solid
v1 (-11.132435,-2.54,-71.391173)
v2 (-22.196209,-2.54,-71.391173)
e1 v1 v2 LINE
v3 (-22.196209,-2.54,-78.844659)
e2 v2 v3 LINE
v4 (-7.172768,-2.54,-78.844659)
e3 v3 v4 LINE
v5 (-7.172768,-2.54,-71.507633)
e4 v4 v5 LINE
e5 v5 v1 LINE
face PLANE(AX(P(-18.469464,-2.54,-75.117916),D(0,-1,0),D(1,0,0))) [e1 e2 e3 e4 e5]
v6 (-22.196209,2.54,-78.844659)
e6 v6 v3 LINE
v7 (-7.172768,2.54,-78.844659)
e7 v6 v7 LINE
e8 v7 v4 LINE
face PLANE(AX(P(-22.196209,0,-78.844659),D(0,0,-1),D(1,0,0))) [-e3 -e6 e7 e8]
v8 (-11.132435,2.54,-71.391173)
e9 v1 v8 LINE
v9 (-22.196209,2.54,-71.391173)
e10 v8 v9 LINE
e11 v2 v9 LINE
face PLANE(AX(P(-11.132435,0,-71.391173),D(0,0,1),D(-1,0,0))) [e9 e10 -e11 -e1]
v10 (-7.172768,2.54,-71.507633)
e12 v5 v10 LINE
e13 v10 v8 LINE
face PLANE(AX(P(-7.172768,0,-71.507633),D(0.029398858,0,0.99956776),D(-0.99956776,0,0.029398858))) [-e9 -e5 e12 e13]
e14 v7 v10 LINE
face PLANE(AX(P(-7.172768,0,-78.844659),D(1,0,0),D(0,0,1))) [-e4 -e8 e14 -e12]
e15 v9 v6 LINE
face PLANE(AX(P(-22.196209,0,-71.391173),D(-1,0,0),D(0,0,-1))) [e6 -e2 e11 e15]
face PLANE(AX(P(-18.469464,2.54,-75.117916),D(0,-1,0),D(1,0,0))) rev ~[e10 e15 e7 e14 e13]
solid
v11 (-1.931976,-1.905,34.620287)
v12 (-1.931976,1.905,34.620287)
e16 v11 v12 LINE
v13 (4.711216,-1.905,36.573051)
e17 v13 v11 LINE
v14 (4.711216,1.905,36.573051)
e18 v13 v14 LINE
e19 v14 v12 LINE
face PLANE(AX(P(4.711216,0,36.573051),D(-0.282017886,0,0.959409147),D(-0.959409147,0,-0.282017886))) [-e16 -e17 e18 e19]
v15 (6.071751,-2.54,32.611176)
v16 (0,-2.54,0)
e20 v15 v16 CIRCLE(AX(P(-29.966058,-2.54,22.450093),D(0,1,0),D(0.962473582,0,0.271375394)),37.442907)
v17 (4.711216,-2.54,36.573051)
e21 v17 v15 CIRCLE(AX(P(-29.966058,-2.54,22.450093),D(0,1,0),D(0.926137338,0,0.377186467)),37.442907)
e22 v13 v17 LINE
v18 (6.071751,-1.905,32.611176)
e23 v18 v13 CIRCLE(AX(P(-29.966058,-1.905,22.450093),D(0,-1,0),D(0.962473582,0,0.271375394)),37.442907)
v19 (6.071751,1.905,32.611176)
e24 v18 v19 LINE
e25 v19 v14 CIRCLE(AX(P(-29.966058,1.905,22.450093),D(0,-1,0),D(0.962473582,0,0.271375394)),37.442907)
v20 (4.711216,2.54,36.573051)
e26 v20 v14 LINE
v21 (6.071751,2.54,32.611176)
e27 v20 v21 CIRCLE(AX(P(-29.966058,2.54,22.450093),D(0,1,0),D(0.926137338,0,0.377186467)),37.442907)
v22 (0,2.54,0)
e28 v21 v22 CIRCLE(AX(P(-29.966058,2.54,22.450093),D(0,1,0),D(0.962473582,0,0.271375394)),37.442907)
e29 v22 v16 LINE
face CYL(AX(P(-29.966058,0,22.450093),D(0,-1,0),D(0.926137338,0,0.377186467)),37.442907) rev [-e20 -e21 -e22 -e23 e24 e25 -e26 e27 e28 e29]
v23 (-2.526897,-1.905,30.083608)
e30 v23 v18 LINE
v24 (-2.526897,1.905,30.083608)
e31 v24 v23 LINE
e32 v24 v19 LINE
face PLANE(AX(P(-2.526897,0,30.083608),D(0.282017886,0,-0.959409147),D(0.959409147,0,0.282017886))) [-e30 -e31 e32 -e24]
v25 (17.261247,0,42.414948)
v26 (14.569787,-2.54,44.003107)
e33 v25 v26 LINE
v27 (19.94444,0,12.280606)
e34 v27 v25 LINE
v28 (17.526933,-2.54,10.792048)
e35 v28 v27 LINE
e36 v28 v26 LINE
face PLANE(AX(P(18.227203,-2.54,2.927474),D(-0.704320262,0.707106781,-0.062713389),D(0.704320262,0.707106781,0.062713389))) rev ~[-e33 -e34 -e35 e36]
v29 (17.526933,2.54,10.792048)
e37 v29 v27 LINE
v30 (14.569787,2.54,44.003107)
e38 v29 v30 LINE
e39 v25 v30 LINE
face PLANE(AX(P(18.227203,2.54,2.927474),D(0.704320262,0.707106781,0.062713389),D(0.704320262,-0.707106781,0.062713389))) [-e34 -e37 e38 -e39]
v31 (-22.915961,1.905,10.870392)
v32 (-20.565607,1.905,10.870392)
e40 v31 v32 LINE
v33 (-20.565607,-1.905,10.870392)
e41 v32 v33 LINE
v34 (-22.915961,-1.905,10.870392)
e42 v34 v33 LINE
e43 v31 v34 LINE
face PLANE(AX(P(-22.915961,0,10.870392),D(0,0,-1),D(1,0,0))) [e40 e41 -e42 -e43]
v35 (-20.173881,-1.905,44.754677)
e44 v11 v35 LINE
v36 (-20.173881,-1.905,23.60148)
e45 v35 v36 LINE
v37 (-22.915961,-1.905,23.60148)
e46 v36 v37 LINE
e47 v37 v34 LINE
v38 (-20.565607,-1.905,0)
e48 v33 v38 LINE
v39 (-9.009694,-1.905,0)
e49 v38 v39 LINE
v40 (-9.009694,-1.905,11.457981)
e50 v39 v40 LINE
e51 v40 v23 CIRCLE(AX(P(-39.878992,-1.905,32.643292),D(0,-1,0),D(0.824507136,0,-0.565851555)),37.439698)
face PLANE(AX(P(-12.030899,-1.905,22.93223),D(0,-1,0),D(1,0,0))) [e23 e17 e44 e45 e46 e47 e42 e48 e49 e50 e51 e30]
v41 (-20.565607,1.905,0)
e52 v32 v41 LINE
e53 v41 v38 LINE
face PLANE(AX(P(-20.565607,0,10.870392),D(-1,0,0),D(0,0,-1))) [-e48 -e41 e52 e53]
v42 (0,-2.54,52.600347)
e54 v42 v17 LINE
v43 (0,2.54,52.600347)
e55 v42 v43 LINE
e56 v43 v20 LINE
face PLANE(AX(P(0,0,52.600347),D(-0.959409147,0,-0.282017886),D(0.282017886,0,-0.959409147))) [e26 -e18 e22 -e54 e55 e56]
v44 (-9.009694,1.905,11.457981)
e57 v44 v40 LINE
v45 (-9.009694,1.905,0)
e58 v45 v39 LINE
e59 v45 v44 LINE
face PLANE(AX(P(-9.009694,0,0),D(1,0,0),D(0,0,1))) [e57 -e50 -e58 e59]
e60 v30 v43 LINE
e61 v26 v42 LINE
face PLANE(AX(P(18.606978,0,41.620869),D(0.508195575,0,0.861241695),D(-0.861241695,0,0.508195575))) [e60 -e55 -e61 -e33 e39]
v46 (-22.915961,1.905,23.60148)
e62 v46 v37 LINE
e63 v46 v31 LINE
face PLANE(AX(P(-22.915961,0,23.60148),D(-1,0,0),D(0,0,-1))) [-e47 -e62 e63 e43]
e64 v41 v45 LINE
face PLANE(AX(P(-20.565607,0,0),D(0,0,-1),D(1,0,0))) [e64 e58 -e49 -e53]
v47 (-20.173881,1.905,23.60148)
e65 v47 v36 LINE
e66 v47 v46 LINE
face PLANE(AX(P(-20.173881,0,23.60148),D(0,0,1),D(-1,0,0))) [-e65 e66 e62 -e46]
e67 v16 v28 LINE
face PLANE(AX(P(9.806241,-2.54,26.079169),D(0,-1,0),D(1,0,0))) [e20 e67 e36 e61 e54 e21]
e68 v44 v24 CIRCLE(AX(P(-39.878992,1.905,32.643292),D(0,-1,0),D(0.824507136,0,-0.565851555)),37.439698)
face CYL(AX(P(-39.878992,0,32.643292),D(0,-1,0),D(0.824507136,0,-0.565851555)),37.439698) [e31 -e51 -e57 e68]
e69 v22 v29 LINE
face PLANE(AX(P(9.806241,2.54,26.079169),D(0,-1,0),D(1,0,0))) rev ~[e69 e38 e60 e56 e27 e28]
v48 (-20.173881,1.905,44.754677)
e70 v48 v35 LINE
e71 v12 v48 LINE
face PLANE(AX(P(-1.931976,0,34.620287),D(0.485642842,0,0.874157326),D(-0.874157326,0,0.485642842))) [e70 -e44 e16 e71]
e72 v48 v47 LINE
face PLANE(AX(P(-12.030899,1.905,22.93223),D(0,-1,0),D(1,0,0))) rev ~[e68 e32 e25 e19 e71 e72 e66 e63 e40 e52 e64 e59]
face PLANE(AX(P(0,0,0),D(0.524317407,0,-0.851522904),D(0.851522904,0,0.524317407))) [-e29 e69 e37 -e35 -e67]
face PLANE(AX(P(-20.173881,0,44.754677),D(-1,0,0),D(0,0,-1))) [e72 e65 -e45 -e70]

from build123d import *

# Parameters (mm, degrees)
F3_DEPTH    = 1.905
F4_DEPTH    = 2.54
F5_T1_DEPTH = 48.3053442814
F6_DEPTH    = 2.54


# Not quite as in the source:
# - a fillet or chamfer that OpenCascade refuses, or shapes differently, is made with other operations: its cross-section is extruded or revolved along the edge and cut away or added
# - the program builds the solid bodies; features that only make, move or delete a surface that nothing else refers to are left out


with BuildPart() as f3:
    # F0 (on Front) → F3 (new body, symmetric)
    with BuildSketch(Plane.XZ):
        with BuildLine():
            Line((-1.9319759193, 34.6202871443), (-20.1738812029, 44.7546765208))
            Line((-20.1738812029, 44.7546765208), (-20.1738812029, 23.6014798284))
            Line((-20.1738812029, 23.6014798284), (-22.9159612209, 23.6014798284))
            Line((-22.9159612209, 23.6014798284), (-22.9159612209, 10.8703924343))
            Line((-22.9159612209, 10.8703924343), (-20.5656066537, 10.8703924343))
            Line((-20.5656066537, 10.8703924343), (-20.5656066537, 0))
            Line((-20.5656066537, 0), (-18.231138587, 0))
            Line((-18.231138587, 0), (-14.9366050027, 0))
            Line((-14.9366050027, 0), (-11.6420714185, 0))
            Line((-11.6420714185, 0), (-11.3464937492, 0))
            Line((-11.3464937492, 0), (-9.0096937492, 0))
            Line((-9.0096937492, 0), (-9.0096937492, 11.4579806104))
            ThreePointArc((-9.0096937492, 11.4579806104), (-4.5198612968, 20.3362668162), (-2.5268969009, 30.0836077008))
            Line((-2.5268969009, 30.0836077008), (6.0717510059, 32.6111763716))
            ThreePointArc((6.0717510059, 32.6111763716), (5.4469320969, 34.6111548057), (4.7112164165, 36.5730505327))
            Line((4.7112164165, 36.5730505327), (-1.9319759193, 34.6202871443))
        make_face()
    extrude(amount=F3_DEPTH, both=True)

    # F0 (on Front) → F4 (join, symmetric)
    with BuildSketch(Plane.XZ):
        with BuildLine():
            Line((0, 52.6003465056), (4.7112164165, 36.5730505327))
            ThreePointArc((4.7112164165, 36.5730505327), (5.4469320969, 34.6111548057), (6.0717510059, 32.6111763716))
            ThreePointArc((6.0717510059, 32.6111763716), (6.8442642331, 15.59651876), (0, 0))
            Line((0, 0), (21.1531929672, 13.0248842761))
            Line((21.1531929672, 13.0248842761), (18.6069775373, 41.6208691895))
            Line((18.6069775373, 41.6208691895), (0, 52.6003465056))
        make_face()
    extrude(amount=F4_DEPTH, both=True)

    # F5: chamfer of 3.81 on 2 edges, made by hand

    # F5_s2 → F5_t1 (cut)
    with BuildSketch(Plane(origin=(-0.1152408587, 0, 1.2942447122), x_dir=(0, 1, 0), z_dir=(-0.0886901249, 0, 0.9960592662))):
        Polygon((-2.54, -18.4150124772), (1.27, -22.2250124772), (-2.54, -22.2250124772), align=None)
        Polygon((2.54, -18.4150124772), (-1.27, -22.2250124772), (2.54, -22.2250124772), align=None)
    extrude(amount=F5_T1_DEPTH, mode=Mode.SUBTRACT)


with BuildPart() as f6:
    # F0 (on Front) → F6 (new body, symmetric)
    with BuildSketch(Plane.XZ):
        Polygon((-14.7427194752, -78.8446590304), (-14.7427194752, -71.3911727071), (-18.3530040085, -71.3911727071), (-22.1962090582, -71.3911727071), (-22.1962090582, -78.8446590304), align=None)
        Polygon((-11.1324349418, -71.3911727071), (-14.7427194752, -71.3911727071), (-14.7427194752, -78.8446590304), (-7.1727680042, -78.8446590304), (-7.1727680042, -71.5076327324), align=None)
    extrude(amount=F6_DEPTH, both=True)


solid = Compound([f3.part, f6.part])
